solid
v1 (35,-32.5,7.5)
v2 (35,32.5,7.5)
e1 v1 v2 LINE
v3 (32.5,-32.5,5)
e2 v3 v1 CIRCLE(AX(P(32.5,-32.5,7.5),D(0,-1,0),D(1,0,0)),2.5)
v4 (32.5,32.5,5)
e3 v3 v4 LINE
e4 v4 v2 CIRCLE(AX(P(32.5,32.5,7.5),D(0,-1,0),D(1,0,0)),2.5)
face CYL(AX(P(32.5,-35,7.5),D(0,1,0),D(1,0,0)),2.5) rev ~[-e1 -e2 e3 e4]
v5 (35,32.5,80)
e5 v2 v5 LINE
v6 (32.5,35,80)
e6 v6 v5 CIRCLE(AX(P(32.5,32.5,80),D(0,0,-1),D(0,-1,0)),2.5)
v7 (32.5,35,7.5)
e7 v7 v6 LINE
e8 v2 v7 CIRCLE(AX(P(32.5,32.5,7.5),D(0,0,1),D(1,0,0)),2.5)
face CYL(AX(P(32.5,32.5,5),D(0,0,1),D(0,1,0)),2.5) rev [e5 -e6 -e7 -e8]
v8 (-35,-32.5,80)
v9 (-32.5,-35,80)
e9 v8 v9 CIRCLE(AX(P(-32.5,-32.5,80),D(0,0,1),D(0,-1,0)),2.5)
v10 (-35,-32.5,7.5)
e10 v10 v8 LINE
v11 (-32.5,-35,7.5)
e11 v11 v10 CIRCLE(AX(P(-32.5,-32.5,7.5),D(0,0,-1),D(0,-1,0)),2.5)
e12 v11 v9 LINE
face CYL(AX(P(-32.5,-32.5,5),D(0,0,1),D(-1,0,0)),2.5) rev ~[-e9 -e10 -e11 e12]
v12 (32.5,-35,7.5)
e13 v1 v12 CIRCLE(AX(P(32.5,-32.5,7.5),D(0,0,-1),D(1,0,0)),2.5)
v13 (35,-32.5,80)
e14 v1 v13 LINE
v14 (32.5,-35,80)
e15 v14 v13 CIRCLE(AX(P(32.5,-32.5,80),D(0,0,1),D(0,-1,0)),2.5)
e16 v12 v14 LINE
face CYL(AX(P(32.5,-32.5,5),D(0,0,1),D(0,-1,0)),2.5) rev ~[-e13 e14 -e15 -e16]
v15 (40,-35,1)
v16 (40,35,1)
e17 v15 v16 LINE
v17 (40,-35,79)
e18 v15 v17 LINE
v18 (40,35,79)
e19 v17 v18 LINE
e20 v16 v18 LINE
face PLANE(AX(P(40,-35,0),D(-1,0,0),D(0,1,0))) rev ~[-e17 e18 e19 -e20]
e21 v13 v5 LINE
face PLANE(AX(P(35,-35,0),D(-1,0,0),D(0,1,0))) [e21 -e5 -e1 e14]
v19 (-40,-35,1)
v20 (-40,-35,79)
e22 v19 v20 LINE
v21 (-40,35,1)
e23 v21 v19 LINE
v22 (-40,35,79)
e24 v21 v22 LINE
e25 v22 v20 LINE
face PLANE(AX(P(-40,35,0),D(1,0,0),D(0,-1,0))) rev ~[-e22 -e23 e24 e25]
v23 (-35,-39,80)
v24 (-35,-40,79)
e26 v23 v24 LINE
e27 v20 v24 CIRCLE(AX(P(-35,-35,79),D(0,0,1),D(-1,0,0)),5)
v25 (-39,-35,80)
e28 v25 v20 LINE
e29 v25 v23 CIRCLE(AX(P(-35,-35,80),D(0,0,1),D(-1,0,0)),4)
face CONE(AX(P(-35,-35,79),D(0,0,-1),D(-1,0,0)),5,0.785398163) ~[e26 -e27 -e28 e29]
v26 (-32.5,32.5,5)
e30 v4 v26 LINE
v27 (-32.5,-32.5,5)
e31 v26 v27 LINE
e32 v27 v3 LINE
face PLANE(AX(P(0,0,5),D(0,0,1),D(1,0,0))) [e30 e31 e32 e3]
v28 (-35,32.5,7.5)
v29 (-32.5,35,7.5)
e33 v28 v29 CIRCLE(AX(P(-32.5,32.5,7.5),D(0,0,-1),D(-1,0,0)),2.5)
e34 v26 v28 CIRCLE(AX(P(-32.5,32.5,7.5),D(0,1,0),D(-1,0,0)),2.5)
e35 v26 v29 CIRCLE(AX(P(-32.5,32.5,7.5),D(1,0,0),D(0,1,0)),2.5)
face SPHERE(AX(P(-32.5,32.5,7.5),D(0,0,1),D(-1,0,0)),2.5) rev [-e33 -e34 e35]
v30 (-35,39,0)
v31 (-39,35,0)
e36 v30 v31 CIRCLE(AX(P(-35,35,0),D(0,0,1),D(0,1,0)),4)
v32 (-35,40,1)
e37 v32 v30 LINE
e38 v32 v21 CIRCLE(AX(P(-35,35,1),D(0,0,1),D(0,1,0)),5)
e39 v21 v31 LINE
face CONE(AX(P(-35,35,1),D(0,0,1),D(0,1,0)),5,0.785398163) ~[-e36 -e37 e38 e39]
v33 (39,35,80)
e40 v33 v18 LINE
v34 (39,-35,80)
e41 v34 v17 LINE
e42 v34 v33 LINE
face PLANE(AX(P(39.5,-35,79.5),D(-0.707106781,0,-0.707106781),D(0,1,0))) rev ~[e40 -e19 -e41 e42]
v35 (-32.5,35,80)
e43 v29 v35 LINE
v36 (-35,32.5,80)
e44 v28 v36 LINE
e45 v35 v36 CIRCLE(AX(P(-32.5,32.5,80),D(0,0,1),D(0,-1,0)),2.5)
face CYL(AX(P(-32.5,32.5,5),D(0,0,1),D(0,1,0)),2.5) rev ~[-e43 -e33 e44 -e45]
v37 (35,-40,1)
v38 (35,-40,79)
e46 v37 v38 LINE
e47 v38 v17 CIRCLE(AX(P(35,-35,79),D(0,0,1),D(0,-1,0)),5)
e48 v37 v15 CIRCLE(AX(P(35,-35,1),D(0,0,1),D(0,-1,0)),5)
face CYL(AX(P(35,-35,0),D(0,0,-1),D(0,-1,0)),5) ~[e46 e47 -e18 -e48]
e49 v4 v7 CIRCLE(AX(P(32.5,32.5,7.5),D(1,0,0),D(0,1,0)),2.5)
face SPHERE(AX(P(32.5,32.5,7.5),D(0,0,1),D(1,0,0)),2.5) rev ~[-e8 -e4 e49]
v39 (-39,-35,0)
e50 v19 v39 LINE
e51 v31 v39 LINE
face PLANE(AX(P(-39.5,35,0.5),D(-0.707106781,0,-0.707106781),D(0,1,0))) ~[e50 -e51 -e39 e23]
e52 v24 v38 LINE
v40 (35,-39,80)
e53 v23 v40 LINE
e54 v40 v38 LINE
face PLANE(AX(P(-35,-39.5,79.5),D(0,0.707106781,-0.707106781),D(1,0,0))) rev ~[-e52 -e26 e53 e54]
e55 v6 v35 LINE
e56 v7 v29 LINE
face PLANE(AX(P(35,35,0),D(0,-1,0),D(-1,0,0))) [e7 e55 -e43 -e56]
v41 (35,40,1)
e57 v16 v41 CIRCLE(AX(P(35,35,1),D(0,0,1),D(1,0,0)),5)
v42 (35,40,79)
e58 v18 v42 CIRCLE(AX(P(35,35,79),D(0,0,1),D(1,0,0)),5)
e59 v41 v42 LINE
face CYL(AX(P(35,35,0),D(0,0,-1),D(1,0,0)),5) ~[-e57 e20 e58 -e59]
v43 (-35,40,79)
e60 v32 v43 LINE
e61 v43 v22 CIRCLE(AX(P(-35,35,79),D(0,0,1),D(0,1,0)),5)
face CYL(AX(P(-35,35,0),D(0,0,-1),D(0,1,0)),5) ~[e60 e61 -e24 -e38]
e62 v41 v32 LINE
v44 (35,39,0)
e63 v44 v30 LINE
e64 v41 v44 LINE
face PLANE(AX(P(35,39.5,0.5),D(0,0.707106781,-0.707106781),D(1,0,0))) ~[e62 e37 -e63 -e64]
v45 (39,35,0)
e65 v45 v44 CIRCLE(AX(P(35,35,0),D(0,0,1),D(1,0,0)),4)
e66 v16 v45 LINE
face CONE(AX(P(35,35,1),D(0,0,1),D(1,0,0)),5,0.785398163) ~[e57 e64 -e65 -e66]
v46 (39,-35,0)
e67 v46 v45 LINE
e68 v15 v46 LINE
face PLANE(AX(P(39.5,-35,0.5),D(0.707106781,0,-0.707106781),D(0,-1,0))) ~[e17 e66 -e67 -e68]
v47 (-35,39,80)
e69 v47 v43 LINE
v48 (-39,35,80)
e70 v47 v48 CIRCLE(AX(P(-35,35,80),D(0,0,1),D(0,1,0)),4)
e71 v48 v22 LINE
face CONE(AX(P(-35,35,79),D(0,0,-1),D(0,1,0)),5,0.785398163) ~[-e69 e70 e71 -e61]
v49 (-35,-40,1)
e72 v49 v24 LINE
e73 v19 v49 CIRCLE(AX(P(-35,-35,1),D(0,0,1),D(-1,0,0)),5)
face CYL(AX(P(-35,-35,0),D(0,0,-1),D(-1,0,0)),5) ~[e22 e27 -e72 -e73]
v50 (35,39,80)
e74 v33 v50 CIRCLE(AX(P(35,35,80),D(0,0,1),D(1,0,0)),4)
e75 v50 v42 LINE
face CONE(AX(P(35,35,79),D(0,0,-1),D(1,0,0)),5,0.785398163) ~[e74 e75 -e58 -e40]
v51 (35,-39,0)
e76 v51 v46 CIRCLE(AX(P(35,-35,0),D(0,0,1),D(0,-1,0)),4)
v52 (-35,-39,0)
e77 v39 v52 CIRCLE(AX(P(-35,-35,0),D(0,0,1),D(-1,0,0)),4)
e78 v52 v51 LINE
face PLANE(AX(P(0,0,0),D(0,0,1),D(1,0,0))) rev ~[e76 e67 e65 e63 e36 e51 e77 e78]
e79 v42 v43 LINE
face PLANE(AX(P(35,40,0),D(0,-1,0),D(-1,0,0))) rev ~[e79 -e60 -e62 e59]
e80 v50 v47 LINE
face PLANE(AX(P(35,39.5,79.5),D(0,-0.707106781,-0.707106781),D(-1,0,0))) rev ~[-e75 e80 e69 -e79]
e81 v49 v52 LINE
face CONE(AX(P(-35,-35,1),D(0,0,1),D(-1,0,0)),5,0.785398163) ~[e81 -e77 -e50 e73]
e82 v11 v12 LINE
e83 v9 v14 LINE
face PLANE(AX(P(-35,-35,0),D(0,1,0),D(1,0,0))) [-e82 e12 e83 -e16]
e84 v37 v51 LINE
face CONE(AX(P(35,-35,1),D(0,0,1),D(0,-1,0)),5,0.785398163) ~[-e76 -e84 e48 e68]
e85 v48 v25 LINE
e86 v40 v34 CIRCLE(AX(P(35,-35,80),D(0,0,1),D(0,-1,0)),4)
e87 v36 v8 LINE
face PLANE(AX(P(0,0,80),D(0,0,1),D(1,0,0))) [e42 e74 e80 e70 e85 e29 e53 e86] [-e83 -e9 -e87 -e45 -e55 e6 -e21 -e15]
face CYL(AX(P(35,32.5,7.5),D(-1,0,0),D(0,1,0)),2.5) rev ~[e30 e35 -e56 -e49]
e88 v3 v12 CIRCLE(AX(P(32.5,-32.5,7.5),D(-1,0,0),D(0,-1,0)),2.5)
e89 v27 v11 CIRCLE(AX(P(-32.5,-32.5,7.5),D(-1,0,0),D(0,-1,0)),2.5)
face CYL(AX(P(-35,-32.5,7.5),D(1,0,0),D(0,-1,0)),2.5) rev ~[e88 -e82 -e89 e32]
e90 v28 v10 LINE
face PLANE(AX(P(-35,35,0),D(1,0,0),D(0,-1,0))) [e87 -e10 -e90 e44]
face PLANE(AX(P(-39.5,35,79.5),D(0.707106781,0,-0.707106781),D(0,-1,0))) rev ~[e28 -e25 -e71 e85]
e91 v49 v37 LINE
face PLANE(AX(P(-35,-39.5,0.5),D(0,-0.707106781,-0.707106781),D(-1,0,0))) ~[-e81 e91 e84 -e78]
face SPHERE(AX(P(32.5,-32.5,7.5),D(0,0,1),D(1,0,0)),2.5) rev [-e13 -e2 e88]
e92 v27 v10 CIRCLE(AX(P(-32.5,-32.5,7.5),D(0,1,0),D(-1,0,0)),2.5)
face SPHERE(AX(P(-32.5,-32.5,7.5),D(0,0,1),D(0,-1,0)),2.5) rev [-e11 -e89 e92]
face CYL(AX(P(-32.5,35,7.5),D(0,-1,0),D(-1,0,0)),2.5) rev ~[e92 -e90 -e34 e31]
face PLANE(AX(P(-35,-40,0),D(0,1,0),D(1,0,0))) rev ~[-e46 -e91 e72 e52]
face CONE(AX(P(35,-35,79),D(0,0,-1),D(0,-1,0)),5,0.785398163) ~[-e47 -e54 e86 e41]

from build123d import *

# Parameters (mm, degrees)
F1_DEPTH = 80
F2_T     = 5
F3_R     = 2.5
F4_SIZE  = 1


# Not quite as in the source:
# - a shell that OpenCascade refuses in one call is made with other operations: the cavity is built on its own and cut out


with BuildPart() as f1:
    # F0 (on Top) → F1 (new body)
    with BuildSketch(Plane.XY):
        with BuildLine():
            Line((35, 40), (-35, 40))
            ThreePointArc((-35, 40), (-38.5355339059, 38.5355339059), (-40, 35))
            Line((-40, 35), (-40, -35))
            ThreePointArc((-40, -35), (-38.5355339059, -38.5355339059), (-35, -40))
            Line((-35, -40), (35, -40))
            ThreePointArc((35, -40), (38.5355339059, -38.5355339059), (40, -35))
            Line((40, -35), (40, 35))
            ThreePointArc((40, 35), (38.5355339059, 38.5355339059), (35, 40))
        make_face()
    extrude(amount=F1_DEPTH)

    # F2: shell of thickness 5, made by hand


with BuildPart() as f2_core1:
    # F2_t2: copy of F1
    add(f1.part)

    # the walls: a layer under each face that stays
    f2_faces = [f2_core1.faces().sort_by_distance(p)[0] for p in [
        (0, 40, 40),
        (-40, 0, 40),
        (0, -40, 40),
        (40, 0, 40),
        (0, 0, 0),
    ]]
    thicken(f2_faces, amount=-F2_T, mode=Mode.SUBTRACT)


with BuildPart() as f1_1:
    add(f1.part)

    # what is left inside the walls is the cavity
    f2_cavity = [f2_core1.part.solids().sort_by_distance(p)[0] for p in [
        (0, 34.95, 55),
    ]]
    add(f2_cavity, mode=Mode.SUBTRACT)

    # F3
    f3_edges = [f1_1.edges().sort_by_distance(p)[0] for p in [
        (35, 35, 42.5),
        (-35, 35, 42.5),
        (-35, -35, 42.5),
        (35, -35, 42.5),
        (35, 0, 5),
        (0, -35, 5),
        (-35, 0, 5),
        (0, 35, 5),
    ]]
    fillet(f3_edges, radius=F3_R)

    # F4
    f4_edges = [f1_1.edges().sort_by_distance(p)[0] for p in [
        (0, 40, 0),
        (-38.535534, 38.535534, 0),
        (-40, 0, 0),
        (-38.535534, -38.535534, 0),
        (0, -40, 0),
        (38.535534, -38.535534, 0),
        (40, 0, 0),
        (38.535534, 38.535534, 0),
        (0, 40, 80),
        (-38.535534, 38.535534, 80),
    ]]
    chamfer(f4_edges, length=F4_SIZE)


solid = f1_1.part
